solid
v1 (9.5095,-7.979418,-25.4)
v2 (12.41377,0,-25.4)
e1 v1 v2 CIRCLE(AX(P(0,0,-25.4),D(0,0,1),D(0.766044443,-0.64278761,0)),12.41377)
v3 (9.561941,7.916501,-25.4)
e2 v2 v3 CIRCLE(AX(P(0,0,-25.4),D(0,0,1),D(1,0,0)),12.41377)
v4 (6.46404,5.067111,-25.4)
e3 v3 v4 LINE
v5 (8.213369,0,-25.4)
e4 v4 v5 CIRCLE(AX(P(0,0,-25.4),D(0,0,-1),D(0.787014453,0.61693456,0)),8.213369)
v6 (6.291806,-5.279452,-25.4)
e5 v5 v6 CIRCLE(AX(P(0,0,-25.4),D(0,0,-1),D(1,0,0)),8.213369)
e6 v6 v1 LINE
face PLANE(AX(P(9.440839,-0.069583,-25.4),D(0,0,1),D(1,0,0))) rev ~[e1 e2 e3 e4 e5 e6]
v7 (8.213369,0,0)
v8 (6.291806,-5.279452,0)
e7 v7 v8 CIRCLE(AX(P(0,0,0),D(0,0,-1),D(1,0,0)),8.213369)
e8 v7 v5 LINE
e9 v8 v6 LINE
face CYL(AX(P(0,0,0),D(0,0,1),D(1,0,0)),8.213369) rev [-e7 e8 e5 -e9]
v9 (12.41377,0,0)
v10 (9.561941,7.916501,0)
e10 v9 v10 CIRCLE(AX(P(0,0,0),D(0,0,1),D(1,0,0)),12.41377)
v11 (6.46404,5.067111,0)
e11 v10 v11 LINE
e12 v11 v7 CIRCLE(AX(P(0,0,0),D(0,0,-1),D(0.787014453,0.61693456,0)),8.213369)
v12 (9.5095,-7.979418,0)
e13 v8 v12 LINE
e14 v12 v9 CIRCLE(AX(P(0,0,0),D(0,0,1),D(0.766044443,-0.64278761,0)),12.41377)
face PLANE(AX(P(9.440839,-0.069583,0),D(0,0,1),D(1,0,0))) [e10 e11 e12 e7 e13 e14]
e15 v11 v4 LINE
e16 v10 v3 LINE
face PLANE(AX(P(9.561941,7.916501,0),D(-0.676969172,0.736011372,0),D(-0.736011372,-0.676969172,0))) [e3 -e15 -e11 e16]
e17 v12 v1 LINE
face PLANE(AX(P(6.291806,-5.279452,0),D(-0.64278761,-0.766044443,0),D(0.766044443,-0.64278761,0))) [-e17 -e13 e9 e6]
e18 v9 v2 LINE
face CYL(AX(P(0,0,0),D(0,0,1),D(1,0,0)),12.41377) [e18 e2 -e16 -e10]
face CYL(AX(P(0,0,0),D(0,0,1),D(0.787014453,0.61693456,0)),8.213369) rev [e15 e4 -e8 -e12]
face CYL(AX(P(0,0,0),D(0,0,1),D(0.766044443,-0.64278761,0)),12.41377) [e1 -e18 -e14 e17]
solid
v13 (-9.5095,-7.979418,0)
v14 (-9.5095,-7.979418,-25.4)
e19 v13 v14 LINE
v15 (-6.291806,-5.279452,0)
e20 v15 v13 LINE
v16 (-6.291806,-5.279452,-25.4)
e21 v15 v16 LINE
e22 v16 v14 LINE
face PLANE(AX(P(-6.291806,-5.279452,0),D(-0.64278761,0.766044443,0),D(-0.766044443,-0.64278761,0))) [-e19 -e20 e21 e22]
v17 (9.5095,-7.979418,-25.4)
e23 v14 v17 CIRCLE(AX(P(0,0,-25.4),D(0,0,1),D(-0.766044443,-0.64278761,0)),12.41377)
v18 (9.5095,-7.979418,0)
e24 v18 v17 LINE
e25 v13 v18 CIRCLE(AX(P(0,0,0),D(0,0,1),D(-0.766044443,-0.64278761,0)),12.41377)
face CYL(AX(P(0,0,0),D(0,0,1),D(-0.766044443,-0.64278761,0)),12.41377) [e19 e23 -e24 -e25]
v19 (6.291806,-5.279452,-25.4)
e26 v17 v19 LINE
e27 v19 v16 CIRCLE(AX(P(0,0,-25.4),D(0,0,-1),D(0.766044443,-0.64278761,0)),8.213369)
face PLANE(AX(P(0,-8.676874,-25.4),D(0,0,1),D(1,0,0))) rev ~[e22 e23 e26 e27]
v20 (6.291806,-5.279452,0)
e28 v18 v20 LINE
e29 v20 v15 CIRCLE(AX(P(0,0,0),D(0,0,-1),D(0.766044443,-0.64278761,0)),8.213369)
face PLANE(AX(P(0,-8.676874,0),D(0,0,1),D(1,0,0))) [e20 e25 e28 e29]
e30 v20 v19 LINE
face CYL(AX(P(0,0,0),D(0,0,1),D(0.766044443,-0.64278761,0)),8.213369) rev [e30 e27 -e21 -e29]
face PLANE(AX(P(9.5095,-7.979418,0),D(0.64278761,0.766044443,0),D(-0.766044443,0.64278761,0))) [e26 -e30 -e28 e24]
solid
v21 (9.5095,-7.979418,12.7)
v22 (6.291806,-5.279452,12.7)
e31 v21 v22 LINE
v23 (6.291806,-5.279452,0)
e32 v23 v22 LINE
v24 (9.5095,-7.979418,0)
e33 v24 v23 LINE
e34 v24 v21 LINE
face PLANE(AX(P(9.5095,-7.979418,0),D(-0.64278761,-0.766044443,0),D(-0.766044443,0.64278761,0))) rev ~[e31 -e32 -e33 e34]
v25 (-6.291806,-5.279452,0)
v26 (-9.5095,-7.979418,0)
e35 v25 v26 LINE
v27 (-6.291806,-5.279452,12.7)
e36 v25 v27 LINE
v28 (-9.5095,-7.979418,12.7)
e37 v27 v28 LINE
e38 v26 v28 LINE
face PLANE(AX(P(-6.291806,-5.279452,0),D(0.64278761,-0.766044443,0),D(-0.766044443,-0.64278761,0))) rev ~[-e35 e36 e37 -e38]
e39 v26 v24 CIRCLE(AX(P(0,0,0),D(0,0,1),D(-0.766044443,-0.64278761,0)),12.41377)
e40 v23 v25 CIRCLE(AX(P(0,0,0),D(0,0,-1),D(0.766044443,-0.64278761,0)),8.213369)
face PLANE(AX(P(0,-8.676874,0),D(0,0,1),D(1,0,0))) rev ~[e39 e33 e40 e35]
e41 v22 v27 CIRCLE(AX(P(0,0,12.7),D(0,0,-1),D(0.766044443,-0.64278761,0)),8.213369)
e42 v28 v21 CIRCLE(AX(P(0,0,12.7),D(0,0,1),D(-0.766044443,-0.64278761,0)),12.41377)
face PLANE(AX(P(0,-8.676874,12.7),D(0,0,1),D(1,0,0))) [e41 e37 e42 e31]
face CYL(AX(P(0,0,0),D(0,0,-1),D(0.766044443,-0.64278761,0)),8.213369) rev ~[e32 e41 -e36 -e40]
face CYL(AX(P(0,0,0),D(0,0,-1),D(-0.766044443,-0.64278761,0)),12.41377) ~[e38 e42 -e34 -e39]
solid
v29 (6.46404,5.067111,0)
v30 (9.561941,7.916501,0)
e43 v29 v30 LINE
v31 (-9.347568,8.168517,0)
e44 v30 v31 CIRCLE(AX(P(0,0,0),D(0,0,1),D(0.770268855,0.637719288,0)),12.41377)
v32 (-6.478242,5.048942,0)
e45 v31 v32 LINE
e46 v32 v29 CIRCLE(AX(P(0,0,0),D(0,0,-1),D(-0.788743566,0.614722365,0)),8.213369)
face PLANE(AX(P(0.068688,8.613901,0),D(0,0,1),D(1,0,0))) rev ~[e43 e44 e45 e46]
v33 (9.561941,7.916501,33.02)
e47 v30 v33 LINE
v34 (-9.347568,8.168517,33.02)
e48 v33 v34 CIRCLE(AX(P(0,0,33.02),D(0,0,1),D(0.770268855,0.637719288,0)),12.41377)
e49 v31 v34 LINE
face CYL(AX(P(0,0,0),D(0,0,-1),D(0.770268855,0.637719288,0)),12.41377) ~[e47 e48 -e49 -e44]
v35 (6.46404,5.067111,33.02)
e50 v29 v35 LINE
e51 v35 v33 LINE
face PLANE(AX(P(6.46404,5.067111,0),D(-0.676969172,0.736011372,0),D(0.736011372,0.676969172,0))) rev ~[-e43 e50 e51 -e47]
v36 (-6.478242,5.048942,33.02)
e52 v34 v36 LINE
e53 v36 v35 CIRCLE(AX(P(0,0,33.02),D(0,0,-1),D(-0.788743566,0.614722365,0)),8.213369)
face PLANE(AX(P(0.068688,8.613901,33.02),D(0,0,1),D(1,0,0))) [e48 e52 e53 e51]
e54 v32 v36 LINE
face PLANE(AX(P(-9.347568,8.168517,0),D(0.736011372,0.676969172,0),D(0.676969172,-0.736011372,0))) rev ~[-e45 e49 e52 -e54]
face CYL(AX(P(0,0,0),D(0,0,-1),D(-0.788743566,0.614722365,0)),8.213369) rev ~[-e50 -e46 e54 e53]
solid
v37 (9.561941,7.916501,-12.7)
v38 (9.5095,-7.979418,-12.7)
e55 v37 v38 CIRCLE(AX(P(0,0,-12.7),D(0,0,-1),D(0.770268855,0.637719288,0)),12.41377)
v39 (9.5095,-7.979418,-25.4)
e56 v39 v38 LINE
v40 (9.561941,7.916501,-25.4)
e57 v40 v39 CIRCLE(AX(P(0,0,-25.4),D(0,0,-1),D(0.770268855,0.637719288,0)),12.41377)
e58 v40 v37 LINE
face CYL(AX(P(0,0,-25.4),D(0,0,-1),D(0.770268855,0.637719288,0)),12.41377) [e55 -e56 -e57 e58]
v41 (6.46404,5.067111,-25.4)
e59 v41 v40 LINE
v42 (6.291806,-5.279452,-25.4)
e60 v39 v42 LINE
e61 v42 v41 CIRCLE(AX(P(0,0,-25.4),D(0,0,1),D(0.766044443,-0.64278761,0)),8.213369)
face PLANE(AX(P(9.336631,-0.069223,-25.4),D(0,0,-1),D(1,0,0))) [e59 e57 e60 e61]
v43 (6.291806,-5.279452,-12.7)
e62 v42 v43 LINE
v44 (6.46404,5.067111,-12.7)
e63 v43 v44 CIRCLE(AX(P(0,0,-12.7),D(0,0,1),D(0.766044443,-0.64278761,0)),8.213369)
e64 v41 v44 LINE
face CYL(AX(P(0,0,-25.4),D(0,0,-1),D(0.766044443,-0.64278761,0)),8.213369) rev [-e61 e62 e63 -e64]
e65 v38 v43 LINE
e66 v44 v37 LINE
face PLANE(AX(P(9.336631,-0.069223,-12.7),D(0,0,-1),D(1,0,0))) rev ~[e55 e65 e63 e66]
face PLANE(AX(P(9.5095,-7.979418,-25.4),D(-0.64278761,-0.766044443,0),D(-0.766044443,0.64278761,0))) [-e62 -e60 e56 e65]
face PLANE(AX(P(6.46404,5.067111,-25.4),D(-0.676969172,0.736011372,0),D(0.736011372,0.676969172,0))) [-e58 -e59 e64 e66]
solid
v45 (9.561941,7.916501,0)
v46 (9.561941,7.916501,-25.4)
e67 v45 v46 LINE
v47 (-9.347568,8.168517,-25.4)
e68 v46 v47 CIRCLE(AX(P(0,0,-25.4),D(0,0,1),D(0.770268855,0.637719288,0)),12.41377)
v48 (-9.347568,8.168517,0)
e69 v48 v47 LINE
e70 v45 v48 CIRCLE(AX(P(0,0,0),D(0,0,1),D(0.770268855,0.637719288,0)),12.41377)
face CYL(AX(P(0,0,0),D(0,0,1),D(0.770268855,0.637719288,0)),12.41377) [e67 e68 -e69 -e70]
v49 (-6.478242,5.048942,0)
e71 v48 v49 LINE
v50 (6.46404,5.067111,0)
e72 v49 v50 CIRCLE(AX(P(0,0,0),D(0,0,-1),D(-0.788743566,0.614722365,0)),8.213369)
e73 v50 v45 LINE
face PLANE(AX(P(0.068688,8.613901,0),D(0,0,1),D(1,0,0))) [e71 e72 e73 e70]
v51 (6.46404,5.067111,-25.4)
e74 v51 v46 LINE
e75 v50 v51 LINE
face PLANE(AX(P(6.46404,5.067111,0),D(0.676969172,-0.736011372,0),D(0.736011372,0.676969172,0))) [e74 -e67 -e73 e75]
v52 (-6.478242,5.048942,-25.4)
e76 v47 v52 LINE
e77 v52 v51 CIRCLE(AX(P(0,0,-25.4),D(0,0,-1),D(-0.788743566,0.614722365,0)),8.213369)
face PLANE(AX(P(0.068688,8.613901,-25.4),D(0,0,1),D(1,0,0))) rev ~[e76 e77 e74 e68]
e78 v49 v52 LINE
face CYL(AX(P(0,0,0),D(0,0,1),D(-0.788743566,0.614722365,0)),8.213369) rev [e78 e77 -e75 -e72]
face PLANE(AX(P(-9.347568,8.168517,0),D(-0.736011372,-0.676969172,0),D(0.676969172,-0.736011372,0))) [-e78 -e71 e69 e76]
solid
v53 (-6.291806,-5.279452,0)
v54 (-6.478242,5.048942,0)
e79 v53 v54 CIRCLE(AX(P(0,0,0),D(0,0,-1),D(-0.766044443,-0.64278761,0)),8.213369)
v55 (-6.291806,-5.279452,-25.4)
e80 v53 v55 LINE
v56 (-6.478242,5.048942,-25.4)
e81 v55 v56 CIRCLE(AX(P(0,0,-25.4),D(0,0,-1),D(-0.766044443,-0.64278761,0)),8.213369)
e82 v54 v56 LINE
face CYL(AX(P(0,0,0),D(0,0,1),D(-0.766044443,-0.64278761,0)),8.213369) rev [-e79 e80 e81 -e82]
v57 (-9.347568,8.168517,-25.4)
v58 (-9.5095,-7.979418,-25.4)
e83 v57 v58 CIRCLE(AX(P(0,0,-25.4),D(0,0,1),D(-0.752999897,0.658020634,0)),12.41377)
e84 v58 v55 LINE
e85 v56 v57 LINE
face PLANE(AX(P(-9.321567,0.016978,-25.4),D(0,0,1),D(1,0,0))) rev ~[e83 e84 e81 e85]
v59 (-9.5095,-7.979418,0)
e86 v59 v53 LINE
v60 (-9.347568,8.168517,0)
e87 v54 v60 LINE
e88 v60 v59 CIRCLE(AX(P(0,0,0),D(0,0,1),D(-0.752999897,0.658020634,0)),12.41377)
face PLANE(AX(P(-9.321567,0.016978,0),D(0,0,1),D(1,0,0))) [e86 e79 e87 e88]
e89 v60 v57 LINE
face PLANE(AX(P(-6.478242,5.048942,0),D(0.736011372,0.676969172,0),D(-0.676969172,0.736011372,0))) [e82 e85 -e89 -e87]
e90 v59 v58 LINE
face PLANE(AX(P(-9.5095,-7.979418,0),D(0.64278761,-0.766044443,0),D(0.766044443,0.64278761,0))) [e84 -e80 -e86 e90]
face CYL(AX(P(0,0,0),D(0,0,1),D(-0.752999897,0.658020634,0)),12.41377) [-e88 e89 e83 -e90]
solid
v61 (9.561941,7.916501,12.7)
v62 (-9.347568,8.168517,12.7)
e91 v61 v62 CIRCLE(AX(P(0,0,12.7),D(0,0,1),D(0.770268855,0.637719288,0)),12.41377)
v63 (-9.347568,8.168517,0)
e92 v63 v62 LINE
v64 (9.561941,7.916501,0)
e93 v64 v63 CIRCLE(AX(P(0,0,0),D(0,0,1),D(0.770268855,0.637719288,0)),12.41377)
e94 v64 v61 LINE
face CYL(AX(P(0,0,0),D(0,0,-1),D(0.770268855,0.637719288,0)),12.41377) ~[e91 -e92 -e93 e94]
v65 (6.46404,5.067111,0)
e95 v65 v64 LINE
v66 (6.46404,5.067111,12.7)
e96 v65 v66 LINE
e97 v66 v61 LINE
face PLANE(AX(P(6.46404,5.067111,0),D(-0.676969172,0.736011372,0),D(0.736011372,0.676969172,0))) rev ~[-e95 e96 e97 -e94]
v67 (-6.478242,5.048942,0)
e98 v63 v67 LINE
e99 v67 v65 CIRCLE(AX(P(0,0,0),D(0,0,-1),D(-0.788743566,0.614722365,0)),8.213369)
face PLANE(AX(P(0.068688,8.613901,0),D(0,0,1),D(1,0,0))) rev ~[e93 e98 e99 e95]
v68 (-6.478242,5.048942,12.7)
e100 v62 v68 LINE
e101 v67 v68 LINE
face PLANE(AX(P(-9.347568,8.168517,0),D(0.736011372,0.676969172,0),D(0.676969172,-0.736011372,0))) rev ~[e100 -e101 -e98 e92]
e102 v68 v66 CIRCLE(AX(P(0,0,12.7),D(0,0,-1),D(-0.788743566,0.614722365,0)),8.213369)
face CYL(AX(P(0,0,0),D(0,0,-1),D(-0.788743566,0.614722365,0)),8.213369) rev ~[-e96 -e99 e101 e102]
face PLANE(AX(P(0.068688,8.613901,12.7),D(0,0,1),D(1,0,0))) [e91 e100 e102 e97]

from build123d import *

# Parameters (mm, degrees)
F1_DEPTH = 25.4
F2_DEPTH = 12.7
F3_DEPTH = 33.02
F4_DEPTH = 25.4


with BuildPart() as f1:
    # F0 (on Top) → F1 (new body)
    with BuildSketch(Plane.XY):
        with BuildLine():
            Line((-6.4782422297, 5.0489418333), (-9.3475677746, 8.1685170208))
            ThreePointArc((-9.3475677746, 8.1685170208), (-12.4131461964, 0.1244794215), (-9.5094997737, -7.9794177528))
            Line((-9.5094997737, -7.9794177528), (-6.2918059472, -5.2794520497))
            ThreePointArc((-6.2918059472, -5.2794520497), (-8.2120315794, -0.1482341453), (-6.4782422297, 5.0489418333))
        make_face()
    extrude(amount=-F1_DEPTH)


with BuildPart() as f1b:
    # F0 (on Top) → F1, piece 2 (new body)
    with BuildSketch(Plane.XY):
        with BuildLine():
            ThreePointArc((9.5094997737, -7.9794177528), (11.6651283682, -4.2457595049), (12.4137703225, 0))
            ThreePointArc((12.4137703225, 0), (11.67907164, 4.2072531714), (9.5619406546, 7.9165007761))
            Line((9.5619406546, 7.9165007761), (6.4640403816, 5.0671114027))
            ThreePointArc((6.4640403816, 5.0671114027), (7.7637293599, 2.6802877548), (8.2133693465, 0))
            ThreePointArc((8.2133693465, 0), (7.7180425667, -2.8091377611), (6.2918059472, -5.2794520497))
            Line((6.2918059472, -5.2794520497), (9.5094997737, -7.9794177528))
        make_face()
    extrude(amount=-F1_DEPTH)


with BuildPart() as f2:
    # F0 (on Top) + F1_face (on face) → F2 (new body)
    with BuildSketch(Plane.XY):
        with BuildLine():
            ThreePointArc((-9.5094997737, -7.9794177528), (0, -12.4137703225), (9.5094997737, -7.9794177528))
            Line((9.5094997737, -7.9794177528), (6.2918059472, -5.2794520497))
            ThreePointArc((6.2918059472, -5.2794520497), (0, -8.2133693465), (-6.2918059472, -5.2794520497))
            Line((-6.2918059472, -5.2794520497), (-9.5094997737, -7.9794177528))
        make_face()
        with BuildLine():
            Line((6.4640403816, 5.0671114027), (9.5619406546, 7.9165007761))
            ThreePointArc((9.5619406546, 7.9165007761), (0.1654296824, 12.4126679904), (-9.3475677746, 8.1685170208))
            Line((-9.3475677746, 8.1685170208), (-6.4782422297, 5.0489418333))
            ThreePointArc((-6.4782422297, 5.0489418333), (-0.0115306737, 8.2133612526), (6.4640403816, 5.0671114027))
        make_face()
    with BuildSketch(Plane(origin=(9.6516208653, -0.0788264045, -25.4), x_dir=(1, 0, 0), z_dir=(0, 0, -1))):
        with BuildLine():
            Line((-0.1421210916, 7.9005913483), (-3.3598149181, 5.2006256452))
            ThreePointArc((-3.3598149181, 5.2006256452), (-1.439389274, 0.0578787992), (-3.1875804837, -5.1459378071))
            Line((-3.1875804837, -5.1459378071), (-0.0896802107, -7.9953271806))
            ThreePointArc((-0.0896802107, -7.9953271806), (2.7620819051, -0.0378734072), (-0.1421210916, 7.9005913483))
        make_face()
    extrude(amount=F2_DEPTH, dir=(0, 0, 1))


with BuildPart() as f3:
    # F0 (on Top) → F3 (new body)
    with BuildSketch(Plane.XY):
        with BuildLine():
            Line((6.4640403816, 5.0671114027), (9.5619406546, 7.9165007761))
            ThreePointArc((9.5619406546, 7.9165007761), (0.1654296824, 12.4126679904), (-9.3475677746, 8.1685170208))
            Line((-9.3475677746, 8.1685170208), (-6.4782422297, 5.0489418333))
            ThreePointArc((-6.4782422297, 5.0489418333), (-0.0115306737, 8.2133612526), (6.4640403816, 5.0671114027))
        make_face()
    extrude(amount=F3_DEPTH)


with BuildPart() as f4:
    # F0 (on Top) → F4 (new body)
    with BuildSketch(Plane.XY):
        with BuildLine():
            ThreePointArc((-9.5094997737, -7.9794177528), (0, -12.4137703225), (9.5094997737, -7.9794177528))
            Line((9.5094997737, -7.9794177528), (6.2918059472, -5.2794520497))
            ThreePointArc((6.2918059472, -5.2794520497), (0, -8.2133693465), (-6.2918059472, -5.2794520497))
            Line((-6.2918059472, -5.2794520497), (-9.5094997737, -7.9794177528))
        make_face()
    extrude(amount=-F4_DEPTH)


with BuildPart() as f4b:
    # F0 (on Top) → F4, piece 2 (new body)
    with BuildSketch(Plane.XY):
        with BuildLine():
            Line((6.4640403816, 5.0671114027), (9.5619406546, 7.9165007761))
            ThreePointArc((9.5619406546, 7.9165007761), (0.1654296824, 12.4126679904), (-9.3475677746, 8.1685170208))
            Line((-9.3475677746, 8.1685170208), (-6.4782422297, 5.0489418333))
            ThreePointArc((-6.4782422297, 5.0489418333), (-0.0115306737, 8.2133612526), (6.4640403816, 5.0671114027))
        make_face()
    extrude(amount=-F4_DEPTH)


solid = Compound([f1.part, f1b.part, f2.part, f3.part, f4.part, f4b.part])
